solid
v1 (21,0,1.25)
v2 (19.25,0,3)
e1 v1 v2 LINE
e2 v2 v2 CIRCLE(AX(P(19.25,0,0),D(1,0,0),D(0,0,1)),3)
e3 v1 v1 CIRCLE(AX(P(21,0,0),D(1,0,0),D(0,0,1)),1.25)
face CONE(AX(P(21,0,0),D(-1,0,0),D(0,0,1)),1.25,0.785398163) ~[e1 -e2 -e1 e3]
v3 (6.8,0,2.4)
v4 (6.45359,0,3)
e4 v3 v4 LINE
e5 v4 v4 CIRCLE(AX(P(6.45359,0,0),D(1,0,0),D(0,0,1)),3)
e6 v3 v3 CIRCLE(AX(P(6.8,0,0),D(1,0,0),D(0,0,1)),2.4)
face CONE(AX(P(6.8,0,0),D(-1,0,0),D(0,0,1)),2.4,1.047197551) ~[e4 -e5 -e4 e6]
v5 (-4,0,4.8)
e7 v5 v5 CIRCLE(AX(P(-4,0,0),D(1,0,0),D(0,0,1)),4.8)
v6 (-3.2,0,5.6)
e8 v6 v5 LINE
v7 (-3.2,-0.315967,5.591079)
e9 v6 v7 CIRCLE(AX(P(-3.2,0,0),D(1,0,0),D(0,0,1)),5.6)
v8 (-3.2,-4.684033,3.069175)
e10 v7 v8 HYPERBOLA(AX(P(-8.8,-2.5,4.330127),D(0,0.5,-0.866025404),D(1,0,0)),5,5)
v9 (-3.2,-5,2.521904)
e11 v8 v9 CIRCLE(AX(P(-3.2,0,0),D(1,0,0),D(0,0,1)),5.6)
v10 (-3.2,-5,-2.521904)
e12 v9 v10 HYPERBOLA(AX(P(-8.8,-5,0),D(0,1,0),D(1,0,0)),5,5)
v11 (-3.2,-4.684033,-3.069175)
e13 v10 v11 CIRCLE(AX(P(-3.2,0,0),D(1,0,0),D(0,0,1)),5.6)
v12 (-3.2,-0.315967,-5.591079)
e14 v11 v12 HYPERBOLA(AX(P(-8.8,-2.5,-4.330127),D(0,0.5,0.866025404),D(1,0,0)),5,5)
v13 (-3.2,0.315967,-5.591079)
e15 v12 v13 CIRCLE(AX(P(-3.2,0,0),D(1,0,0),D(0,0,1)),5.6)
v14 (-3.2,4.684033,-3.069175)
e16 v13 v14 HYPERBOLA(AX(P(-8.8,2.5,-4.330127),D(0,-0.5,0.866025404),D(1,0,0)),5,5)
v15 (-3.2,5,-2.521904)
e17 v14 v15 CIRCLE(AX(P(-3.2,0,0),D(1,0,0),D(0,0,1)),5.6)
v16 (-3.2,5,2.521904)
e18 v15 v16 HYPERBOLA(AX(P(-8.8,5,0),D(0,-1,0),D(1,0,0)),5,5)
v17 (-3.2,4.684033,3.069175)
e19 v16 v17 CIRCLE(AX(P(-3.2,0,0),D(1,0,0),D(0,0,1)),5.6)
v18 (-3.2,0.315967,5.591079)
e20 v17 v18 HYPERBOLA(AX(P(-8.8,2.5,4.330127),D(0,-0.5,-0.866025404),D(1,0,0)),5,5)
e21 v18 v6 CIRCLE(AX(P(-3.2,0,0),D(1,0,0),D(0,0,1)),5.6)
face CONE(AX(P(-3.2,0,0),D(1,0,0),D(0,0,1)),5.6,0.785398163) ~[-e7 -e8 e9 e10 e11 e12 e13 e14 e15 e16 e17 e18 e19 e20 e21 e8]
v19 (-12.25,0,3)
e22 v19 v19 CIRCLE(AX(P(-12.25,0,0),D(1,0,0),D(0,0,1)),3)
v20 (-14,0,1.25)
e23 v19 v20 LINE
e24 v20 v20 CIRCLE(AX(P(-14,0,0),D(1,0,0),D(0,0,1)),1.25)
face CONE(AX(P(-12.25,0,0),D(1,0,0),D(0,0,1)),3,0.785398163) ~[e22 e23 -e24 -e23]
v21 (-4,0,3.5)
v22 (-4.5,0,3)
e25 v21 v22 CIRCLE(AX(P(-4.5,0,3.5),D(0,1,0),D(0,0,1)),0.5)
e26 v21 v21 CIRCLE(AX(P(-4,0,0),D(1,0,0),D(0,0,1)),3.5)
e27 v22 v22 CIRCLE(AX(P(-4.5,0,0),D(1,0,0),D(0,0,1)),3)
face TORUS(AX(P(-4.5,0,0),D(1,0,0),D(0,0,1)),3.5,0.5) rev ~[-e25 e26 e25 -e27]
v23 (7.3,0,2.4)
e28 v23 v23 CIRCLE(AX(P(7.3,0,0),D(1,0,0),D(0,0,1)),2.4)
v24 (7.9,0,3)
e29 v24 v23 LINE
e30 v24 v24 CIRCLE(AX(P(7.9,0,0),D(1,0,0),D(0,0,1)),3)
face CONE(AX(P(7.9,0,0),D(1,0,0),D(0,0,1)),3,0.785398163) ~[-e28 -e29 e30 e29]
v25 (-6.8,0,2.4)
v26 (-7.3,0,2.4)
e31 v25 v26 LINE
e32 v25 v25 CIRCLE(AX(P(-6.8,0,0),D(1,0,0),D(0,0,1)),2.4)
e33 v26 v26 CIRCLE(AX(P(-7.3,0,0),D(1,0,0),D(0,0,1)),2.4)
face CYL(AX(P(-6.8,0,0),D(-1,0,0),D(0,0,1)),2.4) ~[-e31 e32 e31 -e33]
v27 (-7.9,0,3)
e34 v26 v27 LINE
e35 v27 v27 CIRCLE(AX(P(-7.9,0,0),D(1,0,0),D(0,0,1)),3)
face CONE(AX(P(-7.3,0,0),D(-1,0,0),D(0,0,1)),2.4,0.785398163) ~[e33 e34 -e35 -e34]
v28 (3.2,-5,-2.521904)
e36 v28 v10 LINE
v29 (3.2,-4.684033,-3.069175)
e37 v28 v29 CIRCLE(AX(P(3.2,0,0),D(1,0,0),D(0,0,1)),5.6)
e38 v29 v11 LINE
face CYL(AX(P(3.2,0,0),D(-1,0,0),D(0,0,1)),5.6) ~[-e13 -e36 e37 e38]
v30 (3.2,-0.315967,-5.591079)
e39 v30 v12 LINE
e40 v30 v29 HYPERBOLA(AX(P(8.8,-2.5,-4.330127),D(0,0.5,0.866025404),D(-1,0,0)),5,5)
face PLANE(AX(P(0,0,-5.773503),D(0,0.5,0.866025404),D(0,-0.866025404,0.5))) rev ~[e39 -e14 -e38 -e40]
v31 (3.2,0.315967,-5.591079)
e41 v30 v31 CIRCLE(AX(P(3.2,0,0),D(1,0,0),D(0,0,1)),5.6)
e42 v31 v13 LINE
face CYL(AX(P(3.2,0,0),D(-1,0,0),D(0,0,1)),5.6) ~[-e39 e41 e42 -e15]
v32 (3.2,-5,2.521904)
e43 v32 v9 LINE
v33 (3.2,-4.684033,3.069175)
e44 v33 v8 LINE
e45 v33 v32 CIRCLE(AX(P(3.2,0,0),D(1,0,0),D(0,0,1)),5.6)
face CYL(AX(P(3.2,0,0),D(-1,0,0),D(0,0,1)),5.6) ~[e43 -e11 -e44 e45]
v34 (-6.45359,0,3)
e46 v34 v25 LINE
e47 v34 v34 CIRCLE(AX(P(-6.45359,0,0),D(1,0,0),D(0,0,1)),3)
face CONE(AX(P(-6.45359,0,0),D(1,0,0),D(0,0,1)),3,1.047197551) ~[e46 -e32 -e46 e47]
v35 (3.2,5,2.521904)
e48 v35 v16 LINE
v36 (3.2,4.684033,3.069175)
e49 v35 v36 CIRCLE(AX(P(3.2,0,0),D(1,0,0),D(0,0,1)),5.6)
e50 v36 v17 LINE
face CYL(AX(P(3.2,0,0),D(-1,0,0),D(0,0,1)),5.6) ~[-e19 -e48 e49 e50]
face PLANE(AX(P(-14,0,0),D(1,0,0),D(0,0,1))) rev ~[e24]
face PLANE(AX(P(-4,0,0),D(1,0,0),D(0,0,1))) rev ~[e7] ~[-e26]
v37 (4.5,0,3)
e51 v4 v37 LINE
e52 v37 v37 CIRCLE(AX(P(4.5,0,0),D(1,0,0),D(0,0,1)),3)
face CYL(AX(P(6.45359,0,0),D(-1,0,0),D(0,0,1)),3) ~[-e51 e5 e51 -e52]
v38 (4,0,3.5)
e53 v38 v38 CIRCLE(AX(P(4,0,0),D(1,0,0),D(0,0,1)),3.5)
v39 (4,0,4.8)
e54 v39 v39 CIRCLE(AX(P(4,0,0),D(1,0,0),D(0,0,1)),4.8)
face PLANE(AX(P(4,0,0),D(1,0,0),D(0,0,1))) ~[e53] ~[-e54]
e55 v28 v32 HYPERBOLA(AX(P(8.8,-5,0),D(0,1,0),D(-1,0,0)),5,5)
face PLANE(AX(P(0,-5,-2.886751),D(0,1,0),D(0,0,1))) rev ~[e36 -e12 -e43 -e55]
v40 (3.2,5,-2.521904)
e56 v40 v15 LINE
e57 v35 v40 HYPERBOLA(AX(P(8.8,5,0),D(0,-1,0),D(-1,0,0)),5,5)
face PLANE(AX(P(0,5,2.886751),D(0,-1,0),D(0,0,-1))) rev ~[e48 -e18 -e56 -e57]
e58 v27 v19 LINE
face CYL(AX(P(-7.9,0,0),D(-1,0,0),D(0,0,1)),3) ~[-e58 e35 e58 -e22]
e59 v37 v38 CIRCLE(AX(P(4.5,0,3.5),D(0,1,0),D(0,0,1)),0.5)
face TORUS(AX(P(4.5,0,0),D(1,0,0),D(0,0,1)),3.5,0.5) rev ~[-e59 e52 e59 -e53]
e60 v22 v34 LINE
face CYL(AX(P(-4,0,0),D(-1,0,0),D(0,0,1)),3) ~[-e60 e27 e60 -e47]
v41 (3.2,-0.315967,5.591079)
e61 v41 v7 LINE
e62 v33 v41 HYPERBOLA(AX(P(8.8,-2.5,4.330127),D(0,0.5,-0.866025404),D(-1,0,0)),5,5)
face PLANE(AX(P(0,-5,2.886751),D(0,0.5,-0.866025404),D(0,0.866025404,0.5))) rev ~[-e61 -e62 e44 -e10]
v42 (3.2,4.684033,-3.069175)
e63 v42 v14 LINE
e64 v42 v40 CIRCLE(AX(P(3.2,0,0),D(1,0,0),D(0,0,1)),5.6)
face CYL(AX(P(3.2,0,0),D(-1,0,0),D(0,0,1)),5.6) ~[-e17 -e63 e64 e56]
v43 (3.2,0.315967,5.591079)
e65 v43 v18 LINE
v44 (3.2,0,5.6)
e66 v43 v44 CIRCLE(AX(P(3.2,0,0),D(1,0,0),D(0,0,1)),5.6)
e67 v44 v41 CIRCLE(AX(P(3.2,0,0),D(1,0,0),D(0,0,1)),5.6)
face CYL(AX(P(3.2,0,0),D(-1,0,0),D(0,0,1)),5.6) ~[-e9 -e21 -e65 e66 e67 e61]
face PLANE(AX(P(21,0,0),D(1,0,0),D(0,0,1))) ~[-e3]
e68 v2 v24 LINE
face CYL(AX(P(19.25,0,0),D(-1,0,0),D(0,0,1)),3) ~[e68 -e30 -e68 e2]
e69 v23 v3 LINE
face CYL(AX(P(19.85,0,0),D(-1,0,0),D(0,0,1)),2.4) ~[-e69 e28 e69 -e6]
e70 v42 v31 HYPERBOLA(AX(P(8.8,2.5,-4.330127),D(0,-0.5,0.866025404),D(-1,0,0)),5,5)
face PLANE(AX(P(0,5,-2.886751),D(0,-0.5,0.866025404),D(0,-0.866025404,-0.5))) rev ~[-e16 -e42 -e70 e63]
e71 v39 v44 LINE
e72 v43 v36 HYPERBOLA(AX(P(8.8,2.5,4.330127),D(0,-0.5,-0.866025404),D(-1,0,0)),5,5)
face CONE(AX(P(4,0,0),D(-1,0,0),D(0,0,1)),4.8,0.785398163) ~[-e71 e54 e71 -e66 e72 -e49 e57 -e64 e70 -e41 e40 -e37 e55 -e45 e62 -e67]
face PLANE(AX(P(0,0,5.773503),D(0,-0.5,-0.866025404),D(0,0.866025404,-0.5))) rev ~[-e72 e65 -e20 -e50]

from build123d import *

# Parameters (mm, degrees)
F2_R     = 12.5
F3_DEPTH = 12.5
F4_R     = 0.5


# Not quite as in the source:
# - the program builds the solid bodies; features that only make, move or delete a surface that nothing else refers to are left out


with BuildPart() as f1:
    # F0 (on Front) → F1 (revolve)
    with BuildSketch(Plane.XZ):
        Polygon((-14, 0), (21, 0), (21, 1.25), (19.85, 2.4), (7.3, 2.4), (6.8, 2.4), (6.4535898385, 3), (4, 3), (4, 4.8), (3.2, 5.6), (-3.2, 5.6), (-4, 4.8), (-4, 3), (-6.4535898385, 3), (-6.8, 2.4), (-7.3, 2.4), (-12.85, 2.4), (-14, 1.25), align=None)
        Polygon((7.3, 2.4), (19.85, 2.4), (19.25, 3), (7.9, 3), align=None)
        Polygon((-12.25, 3), (-12.85, 2.4), (-7.3, 2.4), (-7.9, 3), align=None)
    revolve(axis=Axis((0, 0, 0), (1, 0, 0)))

    # F2 (on Right) → F3 (cut, symmetric)
    with BuildSketch(Plane.YZ):
        Circle(F2_R)
        Polygon((5, -2.8867513459), (0, -5.7735026919), (-5, -2.8867513459), (-5, 2.8867513459), (0, 5.7735026919), (5, 2.8867513459), align=None, mode=Mode.SUBTRACT)
    extrude(amount=F3_DEPTH, both=True, mode=Mode.SUBTRACT)

    # F4
    f4_edges = [f1.edges().sort_by_distance(p)[0] for p in [
        (-4, 0, -3),
        (4, 0, -3),
    ]]
    fillet(f4_edges, radius=F4_R)


solid = f1.part
